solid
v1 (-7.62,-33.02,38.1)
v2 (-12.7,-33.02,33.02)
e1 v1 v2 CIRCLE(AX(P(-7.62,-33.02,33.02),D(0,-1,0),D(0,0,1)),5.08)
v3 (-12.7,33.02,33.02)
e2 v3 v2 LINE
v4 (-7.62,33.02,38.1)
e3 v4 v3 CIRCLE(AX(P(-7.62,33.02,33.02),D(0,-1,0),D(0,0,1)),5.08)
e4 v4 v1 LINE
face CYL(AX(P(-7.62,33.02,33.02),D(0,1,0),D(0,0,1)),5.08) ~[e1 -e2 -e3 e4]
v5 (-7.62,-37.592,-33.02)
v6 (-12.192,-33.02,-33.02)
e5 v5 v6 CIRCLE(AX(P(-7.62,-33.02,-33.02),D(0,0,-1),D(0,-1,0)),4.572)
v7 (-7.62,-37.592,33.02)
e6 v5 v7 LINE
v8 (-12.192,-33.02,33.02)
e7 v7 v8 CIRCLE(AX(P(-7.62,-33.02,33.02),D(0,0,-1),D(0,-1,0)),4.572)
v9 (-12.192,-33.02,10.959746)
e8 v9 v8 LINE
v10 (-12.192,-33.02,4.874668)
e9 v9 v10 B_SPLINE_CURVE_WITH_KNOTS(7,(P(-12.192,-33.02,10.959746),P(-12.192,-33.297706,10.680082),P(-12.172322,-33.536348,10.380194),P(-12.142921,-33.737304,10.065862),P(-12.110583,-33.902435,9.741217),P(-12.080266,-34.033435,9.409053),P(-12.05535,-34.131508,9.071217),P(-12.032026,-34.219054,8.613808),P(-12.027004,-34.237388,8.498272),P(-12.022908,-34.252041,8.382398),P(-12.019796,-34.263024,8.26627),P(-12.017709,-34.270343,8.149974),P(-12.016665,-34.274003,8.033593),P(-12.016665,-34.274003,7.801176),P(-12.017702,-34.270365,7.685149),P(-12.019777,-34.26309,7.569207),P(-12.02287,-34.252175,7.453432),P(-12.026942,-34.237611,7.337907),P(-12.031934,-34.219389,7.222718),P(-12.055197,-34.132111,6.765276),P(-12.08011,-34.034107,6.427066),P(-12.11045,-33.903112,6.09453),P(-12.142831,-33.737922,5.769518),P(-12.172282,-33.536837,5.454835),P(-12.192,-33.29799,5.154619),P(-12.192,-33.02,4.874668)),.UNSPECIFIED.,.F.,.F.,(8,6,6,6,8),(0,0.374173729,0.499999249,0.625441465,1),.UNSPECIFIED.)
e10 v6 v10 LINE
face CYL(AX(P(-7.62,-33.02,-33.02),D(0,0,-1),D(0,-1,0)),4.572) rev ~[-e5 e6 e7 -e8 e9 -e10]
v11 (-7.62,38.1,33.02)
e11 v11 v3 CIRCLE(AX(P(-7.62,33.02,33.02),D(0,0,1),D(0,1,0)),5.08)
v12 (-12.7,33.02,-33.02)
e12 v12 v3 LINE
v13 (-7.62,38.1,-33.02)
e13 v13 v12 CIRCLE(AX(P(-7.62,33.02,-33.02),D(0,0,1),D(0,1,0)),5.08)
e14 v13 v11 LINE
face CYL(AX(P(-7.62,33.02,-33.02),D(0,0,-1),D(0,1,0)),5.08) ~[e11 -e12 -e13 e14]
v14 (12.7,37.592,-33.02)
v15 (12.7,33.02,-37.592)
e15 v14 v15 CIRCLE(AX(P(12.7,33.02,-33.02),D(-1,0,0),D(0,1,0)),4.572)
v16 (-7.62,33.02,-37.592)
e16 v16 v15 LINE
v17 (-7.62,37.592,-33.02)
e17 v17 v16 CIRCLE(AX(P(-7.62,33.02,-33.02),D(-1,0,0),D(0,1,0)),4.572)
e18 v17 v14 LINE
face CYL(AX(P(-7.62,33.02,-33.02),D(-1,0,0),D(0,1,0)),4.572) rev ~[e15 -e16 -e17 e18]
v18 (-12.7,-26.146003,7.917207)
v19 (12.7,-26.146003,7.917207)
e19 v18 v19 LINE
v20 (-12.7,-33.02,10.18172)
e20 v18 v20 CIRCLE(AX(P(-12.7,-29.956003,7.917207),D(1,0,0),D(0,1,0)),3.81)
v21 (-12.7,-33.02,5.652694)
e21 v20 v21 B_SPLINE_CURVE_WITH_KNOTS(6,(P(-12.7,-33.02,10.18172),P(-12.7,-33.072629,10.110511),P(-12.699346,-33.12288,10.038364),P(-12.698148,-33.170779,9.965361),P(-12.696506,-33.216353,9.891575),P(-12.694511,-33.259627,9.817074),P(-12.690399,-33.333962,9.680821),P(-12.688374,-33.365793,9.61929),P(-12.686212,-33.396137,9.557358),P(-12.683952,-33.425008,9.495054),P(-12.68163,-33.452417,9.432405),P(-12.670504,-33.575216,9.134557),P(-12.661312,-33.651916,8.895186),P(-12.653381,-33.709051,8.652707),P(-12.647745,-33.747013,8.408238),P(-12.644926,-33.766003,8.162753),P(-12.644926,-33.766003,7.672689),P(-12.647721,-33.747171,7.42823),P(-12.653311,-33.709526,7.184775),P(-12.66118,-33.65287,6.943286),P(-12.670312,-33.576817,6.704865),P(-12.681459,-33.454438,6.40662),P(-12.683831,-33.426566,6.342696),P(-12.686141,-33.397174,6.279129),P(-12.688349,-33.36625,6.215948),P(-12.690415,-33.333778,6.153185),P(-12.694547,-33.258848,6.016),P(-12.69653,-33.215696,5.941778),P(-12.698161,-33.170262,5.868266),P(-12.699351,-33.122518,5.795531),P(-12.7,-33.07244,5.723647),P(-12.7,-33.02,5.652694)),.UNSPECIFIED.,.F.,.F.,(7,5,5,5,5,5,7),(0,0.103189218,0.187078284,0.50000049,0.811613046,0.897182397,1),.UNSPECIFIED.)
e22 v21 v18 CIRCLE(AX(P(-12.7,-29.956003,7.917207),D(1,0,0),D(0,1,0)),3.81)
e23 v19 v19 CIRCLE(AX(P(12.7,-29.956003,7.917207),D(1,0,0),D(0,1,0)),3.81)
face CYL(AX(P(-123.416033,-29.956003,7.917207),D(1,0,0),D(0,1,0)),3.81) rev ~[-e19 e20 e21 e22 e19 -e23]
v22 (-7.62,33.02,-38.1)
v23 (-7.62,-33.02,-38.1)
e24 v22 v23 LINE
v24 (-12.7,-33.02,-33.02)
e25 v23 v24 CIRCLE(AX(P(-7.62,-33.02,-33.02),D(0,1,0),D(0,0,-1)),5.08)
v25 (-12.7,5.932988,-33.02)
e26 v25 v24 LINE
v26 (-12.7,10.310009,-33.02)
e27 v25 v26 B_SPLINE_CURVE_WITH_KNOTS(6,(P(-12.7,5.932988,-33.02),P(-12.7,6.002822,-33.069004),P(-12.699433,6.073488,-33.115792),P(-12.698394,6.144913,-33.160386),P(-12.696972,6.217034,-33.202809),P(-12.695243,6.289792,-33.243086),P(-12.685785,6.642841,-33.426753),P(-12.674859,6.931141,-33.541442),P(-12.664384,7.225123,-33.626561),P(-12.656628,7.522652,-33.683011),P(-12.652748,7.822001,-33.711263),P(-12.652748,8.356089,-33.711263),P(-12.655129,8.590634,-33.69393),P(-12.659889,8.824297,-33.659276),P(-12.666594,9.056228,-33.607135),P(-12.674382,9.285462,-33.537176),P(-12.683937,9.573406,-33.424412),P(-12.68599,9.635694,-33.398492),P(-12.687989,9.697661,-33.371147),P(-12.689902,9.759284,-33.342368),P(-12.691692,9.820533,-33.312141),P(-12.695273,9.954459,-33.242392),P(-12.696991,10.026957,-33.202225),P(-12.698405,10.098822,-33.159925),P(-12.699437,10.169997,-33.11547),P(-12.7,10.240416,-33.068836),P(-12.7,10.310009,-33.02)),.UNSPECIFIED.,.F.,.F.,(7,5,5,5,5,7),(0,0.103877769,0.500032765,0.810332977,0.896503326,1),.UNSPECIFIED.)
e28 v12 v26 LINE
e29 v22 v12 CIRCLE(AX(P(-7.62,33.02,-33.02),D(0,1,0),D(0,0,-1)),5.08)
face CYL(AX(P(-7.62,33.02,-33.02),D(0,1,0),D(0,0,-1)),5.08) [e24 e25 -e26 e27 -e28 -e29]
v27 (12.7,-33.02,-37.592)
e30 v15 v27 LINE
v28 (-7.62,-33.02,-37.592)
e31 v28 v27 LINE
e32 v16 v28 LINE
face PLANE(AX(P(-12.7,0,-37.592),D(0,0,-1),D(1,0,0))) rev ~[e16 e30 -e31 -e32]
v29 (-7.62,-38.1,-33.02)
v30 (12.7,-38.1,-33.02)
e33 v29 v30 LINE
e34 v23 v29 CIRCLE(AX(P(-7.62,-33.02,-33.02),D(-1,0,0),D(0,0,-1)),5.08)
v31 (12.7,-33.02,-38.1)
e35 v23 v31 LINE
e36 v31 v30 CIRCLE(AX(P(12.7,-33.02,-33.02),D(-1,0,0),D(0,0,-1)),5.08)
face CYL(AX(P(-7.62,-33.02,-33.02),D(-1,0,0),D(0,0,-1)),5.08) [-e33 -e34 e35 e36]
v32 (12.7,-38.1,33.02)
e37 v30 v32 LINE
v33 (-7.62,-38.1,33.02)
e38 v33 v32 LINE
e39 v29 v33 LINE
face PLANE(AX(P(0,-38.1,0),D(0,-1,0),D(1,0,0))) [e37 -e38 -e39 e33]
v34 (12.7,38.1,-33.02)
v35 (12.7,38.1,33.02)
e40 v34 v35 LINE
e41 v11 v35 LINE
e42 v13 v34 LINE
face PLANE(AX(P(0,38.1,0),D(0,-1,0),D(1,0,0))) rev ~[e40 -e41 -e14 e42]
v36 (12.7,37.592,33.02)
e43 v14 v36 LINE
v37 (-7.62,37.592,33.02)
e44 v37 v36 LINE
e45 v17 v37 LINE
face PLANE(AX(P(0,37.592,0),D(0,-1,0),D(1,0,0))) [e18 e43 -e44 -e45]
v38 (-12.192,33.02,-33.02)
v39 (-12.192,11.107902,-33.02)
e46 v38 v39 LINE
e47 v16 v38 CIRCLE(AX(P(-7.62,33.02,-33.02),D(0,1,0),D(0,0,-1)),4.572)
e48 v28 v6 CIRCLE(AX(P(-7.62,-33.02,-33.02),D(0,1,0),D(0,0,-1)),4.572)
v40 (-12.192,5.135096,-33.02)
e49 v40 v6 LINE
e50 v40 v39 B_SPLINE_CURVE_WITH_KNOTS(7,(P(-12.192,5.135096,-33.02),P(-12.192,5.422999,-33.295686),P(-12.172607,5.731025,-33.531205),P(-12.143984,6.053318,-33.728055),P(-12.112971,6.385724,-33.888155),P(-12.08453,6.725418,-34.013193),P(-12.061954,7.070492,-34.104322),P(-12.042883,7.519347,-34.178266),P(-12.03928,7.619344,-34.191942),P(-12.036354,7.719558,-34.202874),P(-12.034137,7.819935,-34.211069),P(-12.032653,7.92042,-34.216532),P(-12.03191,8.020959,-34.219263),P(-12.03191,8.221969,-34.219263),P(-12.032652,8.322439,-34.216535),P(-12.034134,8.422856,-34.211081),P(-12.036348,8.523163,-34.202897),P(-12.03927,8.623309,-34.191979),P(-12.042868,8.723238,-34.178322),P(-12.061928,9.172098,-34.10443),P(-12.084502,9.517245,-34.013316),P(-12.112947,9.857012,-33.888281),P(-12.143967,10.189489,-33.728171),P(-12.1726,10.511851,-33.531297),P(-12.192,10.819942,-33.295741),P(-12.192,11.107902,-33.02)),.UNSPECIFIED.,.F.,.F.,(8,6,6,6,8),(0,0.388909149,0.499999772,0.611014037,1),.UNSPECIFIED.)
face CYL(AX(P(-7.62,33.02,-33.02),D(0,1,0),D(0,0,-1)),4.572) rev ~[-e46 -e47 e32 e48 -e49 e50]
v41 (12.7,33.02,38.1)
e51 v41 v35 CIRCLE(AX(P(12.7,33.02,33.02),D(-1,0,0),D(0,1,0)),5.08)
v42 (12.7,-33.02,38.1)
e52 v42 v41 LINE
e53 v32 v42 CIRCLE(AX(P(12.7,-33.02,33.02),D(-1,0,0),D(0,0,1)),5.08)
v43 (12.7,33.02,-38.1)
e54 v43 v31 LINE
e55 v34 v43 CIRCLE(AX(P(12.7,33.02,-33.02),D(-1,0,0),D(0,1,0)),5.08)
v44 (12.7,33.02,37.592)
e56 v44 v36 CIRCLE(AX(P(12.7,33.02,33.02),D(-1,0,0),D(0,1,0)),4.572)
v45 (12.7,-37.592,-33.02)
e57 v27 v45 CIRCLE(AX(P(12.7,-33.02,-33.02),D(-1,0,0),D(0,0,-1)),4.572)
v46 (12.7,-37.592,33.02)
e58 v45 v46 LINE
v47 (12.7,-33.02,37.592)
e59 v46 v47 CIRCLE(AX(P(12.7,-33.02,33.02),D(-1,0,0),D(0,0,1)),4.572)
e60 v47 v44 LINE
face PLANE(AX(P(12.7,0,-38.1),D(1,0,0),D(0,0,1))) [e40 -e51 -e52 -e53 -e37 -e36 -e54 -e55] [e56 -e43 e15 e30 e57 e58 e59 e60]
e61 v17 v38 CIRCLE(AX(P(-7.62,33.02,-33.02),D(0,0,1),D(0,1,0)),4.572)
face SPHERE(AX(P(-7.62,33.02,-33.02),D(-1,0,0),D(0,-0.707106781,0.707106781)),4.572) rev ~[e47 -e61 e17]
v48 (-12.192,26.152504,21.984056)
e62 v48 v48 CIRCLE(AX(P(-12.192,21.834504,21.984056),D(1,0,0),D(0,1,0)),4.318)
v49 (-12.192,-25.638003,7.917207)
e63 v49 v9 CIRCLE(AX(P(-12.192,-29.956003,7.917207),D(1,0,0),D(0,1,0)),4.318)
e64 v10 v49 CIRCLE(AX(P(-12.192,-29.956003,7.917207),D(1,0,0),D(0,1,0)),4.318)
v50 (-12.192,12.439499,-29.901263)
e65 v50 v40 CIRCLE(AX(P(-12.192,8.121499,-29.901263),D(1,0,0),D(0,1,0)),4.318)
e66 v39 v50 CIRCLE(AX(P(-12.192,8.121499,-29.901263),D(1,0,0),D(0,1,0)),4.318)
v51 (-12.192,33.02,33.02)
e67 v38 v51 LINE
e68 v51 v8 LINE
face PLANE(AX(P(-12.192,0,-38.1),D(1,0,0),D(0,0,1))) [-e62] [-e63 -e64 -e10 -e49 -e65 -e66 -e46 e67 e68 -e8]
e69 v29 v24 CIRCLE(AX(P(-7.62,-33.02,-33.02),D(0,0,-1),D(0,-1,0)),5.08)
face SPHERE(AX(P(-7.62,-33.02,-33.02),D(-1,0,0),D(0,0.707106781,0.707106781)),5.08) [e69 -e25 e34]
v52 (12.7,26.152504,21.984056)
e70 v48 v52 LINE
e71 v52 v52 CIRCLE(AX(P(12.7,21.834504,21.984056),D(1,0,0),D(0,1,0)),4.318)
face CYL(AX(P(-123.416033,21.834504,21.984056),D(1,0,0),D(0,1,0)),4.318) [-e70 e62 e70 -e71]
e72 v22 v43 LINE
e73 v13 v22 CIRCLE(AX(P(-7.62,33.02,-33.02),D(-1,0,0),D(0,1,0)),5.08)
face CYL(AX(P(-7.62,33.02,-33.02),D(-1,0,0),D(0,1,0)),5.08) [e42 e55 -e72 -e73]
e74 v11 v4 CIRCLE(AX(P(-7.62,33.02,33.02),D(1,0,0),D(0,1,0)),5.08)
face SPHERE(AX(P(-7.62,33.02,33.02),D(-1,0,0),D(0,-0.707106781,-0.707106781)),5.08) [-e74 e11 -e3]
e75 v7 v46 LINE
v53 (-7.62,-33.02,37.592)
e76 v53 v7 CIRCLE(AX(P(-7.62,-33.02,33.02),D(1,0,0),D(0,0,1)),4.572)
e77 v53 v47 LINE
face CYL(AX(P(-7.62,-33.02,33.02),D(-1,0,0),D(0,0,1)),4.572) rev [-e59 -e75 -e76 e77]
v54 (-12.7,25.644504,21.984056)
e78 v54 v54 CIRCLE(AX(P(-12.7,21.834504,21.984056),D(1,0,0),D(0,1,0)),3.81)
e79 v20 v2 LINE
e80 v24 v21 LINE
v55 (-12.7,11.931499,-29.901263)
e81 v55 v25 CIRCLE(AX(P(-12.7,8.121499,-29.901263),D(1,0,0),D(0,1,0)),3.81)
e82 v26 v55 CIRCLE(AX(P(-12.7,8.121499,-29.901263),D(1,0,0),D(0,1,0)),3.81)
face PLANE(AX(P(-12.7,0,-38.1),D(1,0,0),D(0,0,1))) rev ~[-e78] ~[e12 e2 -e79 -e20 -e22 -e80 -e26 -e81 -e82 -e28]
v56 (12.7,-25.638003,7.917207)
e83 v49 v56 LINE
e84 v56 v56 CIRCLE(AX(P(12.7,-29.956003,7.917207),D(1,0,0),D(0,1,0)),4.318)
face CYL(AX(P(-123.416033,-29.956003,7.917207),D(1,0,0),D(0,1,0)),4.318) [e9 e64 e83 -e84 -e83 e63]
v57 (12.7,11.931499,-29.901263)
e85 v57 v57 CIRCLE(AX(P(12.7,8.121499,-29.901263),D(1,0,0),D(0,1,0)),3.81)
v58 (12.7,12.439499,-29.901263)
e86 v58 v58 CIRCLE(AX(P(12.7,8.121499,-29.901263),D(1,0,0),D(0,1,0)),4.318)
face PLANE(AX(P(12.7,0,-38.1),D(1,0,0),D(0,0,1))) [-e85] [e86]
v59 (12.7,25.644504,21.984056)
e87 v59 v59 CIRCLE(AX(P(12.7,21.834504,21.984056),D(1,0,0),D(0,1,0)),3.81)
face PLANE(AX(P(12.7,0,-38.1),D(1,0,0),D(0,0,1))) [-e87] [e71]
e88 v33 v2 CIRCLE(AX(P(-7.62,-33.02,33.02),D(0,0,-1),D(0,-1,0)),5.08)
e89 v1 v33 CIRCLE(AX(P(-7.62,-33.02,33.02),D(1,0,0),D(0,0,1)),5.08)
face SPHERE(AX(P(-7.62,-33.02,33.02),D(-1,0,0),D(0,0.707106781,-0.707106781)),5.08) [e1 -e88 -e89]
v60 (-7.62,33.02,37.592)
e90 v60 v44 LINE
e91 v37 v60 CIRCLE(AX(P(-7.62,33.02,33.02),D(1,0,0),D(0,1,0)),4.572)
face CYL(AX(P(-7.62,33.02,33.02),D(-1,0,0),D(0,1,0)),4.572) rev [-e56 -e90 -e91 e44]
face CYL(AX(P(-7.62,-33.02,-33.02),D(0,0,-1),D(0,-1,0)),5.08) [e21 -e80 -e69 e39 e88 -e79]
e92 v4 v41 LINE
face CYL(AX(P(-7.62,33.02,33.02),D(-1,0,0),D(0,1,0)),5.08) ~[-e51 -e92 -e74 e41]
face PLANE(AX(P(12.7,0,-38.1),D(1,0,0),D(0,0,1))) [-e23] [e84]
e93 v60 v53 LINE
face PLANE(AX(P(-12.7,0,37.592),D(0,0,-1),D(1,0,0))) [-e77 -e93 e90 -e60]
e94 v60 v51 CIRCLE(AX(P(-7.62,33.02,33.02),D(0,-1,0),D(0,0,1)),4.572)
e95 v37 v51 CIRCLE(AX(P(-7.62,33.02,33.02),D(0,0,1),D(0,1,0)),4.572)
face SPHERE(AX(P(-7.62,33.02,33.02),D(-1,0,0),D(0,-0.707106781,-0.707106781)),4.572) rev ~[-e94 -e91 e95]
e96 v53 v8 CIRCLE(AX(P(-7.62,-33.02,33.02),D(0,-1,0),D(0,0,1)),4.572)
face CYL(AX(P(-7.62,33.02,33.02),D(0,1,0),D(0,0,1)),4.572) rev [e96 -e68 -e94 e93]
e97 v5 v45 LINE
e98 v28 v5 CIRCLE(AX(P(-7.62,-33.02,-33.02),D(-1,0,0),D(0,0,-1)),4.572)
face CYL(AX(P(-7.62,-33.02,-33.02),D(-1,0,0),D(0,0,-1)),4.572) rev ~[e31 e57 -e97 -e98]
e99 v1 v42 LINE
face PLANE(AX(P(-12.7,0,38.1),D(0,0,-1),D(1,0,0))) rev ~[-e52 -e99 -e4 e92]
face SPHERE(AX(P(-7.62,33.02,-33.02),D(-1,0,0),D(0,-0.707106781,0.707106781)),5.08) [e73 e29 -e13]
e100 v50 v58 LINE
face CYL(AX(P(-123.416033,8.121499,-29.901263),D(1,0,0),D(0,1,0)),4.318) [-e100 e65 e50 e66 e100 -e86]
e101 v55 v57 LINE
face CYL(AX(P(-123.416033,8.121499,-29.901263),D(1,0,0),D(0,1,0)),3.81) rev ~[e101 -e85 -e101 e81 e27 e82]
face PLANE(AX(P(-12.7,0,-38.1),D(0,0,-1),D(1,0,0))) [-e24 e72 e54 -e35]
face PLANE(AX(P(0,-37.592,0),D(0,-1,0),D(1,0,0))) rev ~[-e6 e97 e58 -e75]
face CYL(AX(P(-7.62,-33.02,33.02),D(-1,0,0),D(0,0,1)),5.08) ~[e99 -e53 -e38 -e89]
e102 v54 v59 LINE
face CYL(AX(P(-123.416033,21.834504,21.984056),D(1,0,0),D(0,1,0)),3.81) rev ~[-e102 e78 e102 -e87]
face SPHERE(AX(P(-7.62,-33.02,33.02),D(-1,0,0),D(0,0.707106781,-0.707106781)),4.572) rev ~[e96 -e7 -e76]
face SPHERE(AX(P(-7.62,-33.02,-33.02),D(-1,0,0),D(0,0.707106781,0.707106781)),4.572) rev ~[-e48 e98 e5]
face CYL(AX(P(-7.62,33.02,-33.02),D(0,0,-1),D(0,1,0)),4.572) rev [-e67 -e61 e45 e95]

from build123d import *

# Parameters (mm, degrees)
F0_W         = 25.4
F0_H         = 76.2
F1_DEPTH     = 38.1
F3_D         = 7.62
F4_T1_DEPTH  = 66.04
F4_T3_DEPTH  = 66.04
F4_T5_DEPTH  = 33.02
F4_S9_W      = 5.08
F4_S9_H      = 5.08
F4_T10_DEPTH = 5.08
F4_S15_W     = 5.08
F4_S15_H     = 5.08
F4_T16_DEPTH = 5.08
F4_S21_W     = 5.08
F4_S21_H     = 5.08
F4_T22_DEPTH = 5.08
F4_S27_W     = 5.08
F4_S27_H     = 5.08
F4_T28_DEPTH = 5.08
F5_T         = -0.508


# Not quite as in the source:
# - a fillet or chamfer that OpenCascade refuses, or shapes differently, is made with other operations: its cross-section is extruded or revolved along the edge and cut away or added


with BuildPart() as f1:
    # F0 (on Front) → F1 (new body, symmetric)
    with BuildSketch(Plane.XZ):
        Rectangle(F0_W, F0_H)
    extrude(amount=F1_DEPTH, both=True)

    # F3 (through all)
    with Locations(Plane(origin=(-12.7, 0, 0), x_dir=(0, -1, 0), z_dir=(-1, 0, 0))):
        with Locations((29.9560025906, 7.917207202), (-21.8345038593, 21.9840556383), (-8.1214987313, -29.9012628403)):
            Hole(F3_D / 2)

    # F4: fillet of radius 5.08 on 8 edges, made by hand

    # F4_s2 → F4_t1 (cut)
    with BuildSketch(Plane.XZ.offset(-33.02)):
        with BuildLine():
            ThreePointArc((-7.62, 38.1), (-11.2121024484, 36.6121024484), (-12.7, 33.02))
            Line((-12.7, 33.02), (-12.7, 38.1))
            Line((-12.7, 38.1), (-7.62, 38.1))
        make_face()
        with BuildLine():
            ThreePointArc((-7.62, -38.1), (-11.2121024484, -36.6121024484), (-12.7, -33.02))
            Line((-12.7, -33.02), (-12.7, -38.1))
            Line((-12.7, -38.1), (-7.62, -38.1))
        make_face()
    extrude(amount=F4_T1_DEPTH, mode=Mode.SUBTRACT)

    # F4_s4 → F4_t3 (cut)
    with BuildSketch(Plane.XY.offset(-33.02)):
        with BuildLine():
            ThreePointArc((-7.62, 38.1), (-11.2121024484, 36.6121024484), (-12.7, 33.02))
            Line((-12.7, 33.02), (-12.7, 38.1))
            Line((-12.7, 38.1), (-7.62, 38.1))
        make_face()
        with BuildLine():
            ThreePointArc((-7.62, -38.1), (-11.2121024484, -36.6121024484), (-12.7, -33.02))
            Line((-12.7, -33.02), (-12.7, -38.1))
            Line((-12.7, -38.1), (-7.62, -38.1))
        make_face()
    extrude(amount=F4_T3_DEPTH, mode=Mode.SUBTRACT)

    # F4_s6 → F4_t5 (cut)
    with BuildSketch(Plane.YZ.offset(-7.62)):
        with BuildLine():
            ThreePointArc((38.1, 33.02), (36.6121024484, 36.6121024484), (33.02, 38.1))
            Line((33.02, 38.1), (38.1, 38.1))
            Line((38.1, 38.1), (38.1, 33.02))
        make_face()
        with BuildLine():
            ThreePointArc((38.1, -33.02), (36.6121024484, -36.6121024484), (33.02, -38.1))
            Line((33.02, -38.1), (38.1, -38.1))
            Line((38.1, -38.1), (38.1, -33.02))
        make_face()
        with BuildLine():
            ThreePointArc((-33.02, 38.1), (-36.6121024484, 36.6121024484), (-38.1, 33.02))
            Line((-38.1, 33.02), (-38.1, 38.1))
            Line((-38.1, 38.1), (-33.02, 38.1))
        make_face()
        with BuildLine():
            ThreePointArc((-33.02, -38.1), (-36.6121024484, -36.6121024484), (-38.1, -33.02))
            Line((-38.1, -33.02), (-38.1, -38.1))
            Line((-38.1, -38.1), (-33.02, -38.1))
        make_face()
    extrude(amount=F4_T5_DEPTH, mode=Mode.SUBTRACT)


with BuildPart() as f4_tool8:
    # F4_s9 → F4_t10 (new body)
    with BuildSketch(Plane.YZ.offset(-7.62)):
        with Locations((35.56, 35.56)):
            Rectangle(F4_S9_W, F4_S9_H)
    extrude(amount=-F4_T10_DEPTH)

    # F4_s11 → F4_t12 (revolve, cut)
    with BuildSketch(Plane(origin=(-7.62, 33.02, 33.02), x_dir=(0, -0.7071067812, -0.7071067812), z_dir=(0, 0.7071067812, -0.7071067812))):
        with BuildLine():
            ThreePointArc((0, -5.08), (5.08, 0), (0, 5.08))
            Line((0, 5.08), (0, -5.08))
        make_face()
    revolve(axis=Axis((-7.62, 33.02, 33.02), (-1, 0, 0)), mode=Mode.SUBTRACT)


with BuildPart() as f1_1:
    add(f1.part)

    # F4_t7: cut F4_tool8
    add(f4_tool8.part, mode=Mode.SUBTRACT)


with BuildPart() as f4_tool14:
    # F4_s15 → F4_t16 (new body)
    with BuildSketch(Plane.YZ.offset(-7.62)):
        with Locations((-35.56, 35.56)):
            Rectangle(F4_S15_W, F4_S15_H)
    extrude(amount=-F4_T16_DEPTH)

    # F4_s17 → F4_t18 (revolve, cut)
    with BuildSketch(Plane(origin=(-7.62, -33.02, 33.02), x_dir=(0, 0.7071067812, -0.7071067812), z_dir=(0, 0.7071067812, 0.7071067812))):
        with BuildLine():
            ThreePointArc((0, -5.08), (5.08, 0), (0, 5.08))
            Line((0, 5.08), (0, -5.08))
        make_face()
    revolve(axis=Axis((-7.62, -33.02, 33.02), (-1, 0, 0)), mode=Mode.SUBTRACT)


with BuildPart() as f1_2:
    add(f1_1.part)

    # F4_t13: cut F4_tool14
    add(f4_tool14.part, mode=Mode.SUBTRACT)


with BuildPart() as f4_tool20:
    # F4_s21 → F4_t22 (new body)
    with BuildSketch(Plane.YZ.offset(-7.62)):
        with Locations((35.56, -35.56)):
            Rectangle(F4_S21_W, F4_S21_H)
    extrude(amount=-F4_T22_DEPTH)

    # F4_s23 → F4_t24 (revolve, cut)
    with BuildSketch(Plane(origin=(-7.62, 33.02, -33.02), x_dir=(0, -0.7071067812, 0.7071067812), z_dir=(0, -0.7071067812, -0.7071067812))):
        with BuildLine():
            ThreePointArc((0, -5.08), (5.08, 0), (0, 5.08))
            Line((0, 5.08), (0, -5.08))
        make_face()
    revolve(axis=Axis((-7.62, 33.02, -33.02), (-1, 0, 0)), mode=Mode.SUBTRACT)


with BuildPart() as f1_3:
    add(f1_2.part)

    # F4_t19: cut F4_tool20
    add(f4_tool20.part, mode=Mode.SUBTRACT)


with BuildPart() as f4_tool26:
    # F4_s27 → F4_t28 (new body)
    with BuildSketch(Plane.YZ.offset(-7.62)):
        with Locations((-35.56, -35.56)):
            Rectangle(F4_S27_W, F4_S27_H)
    extrude(amount=-F4_T28_DEPTH)

    # F4_s29 → F4_t30 (revolve, cut)
    with BuildSketch(Plane(origin=(-7.62, -33.02, -33.02), x_dir=(0, 0.7071067812, 0.7071067812), z_dir=(0, -0.7071067812, 0.7071067812))):
        with BuildLine():
            ThreePointArc((0, -5.08), (5.08, 0), (0, 5.08))
            Line((0, 5.08), (0, -5.08))
        make_face()
    revolve(axis=Axis((-7.62, -33.02, -33.02), (-1, 0, 0)), mode=Mode.SUBTRACT)


with BuildPart() as f1_4:
    add(f1_3.part)

    # F4_t25: cut F4_tool26
    add(f4_tool26.part, mode=Mode.SUBTRACT)

    # F5
    f5_openings = [f1_4.faces().sort_by_distance(p)[0] for p in [
        (12.7, 0, 0),
    ]]
    offset(amount=F5_T, openings=f5_openings)


solid = f1_4.part
